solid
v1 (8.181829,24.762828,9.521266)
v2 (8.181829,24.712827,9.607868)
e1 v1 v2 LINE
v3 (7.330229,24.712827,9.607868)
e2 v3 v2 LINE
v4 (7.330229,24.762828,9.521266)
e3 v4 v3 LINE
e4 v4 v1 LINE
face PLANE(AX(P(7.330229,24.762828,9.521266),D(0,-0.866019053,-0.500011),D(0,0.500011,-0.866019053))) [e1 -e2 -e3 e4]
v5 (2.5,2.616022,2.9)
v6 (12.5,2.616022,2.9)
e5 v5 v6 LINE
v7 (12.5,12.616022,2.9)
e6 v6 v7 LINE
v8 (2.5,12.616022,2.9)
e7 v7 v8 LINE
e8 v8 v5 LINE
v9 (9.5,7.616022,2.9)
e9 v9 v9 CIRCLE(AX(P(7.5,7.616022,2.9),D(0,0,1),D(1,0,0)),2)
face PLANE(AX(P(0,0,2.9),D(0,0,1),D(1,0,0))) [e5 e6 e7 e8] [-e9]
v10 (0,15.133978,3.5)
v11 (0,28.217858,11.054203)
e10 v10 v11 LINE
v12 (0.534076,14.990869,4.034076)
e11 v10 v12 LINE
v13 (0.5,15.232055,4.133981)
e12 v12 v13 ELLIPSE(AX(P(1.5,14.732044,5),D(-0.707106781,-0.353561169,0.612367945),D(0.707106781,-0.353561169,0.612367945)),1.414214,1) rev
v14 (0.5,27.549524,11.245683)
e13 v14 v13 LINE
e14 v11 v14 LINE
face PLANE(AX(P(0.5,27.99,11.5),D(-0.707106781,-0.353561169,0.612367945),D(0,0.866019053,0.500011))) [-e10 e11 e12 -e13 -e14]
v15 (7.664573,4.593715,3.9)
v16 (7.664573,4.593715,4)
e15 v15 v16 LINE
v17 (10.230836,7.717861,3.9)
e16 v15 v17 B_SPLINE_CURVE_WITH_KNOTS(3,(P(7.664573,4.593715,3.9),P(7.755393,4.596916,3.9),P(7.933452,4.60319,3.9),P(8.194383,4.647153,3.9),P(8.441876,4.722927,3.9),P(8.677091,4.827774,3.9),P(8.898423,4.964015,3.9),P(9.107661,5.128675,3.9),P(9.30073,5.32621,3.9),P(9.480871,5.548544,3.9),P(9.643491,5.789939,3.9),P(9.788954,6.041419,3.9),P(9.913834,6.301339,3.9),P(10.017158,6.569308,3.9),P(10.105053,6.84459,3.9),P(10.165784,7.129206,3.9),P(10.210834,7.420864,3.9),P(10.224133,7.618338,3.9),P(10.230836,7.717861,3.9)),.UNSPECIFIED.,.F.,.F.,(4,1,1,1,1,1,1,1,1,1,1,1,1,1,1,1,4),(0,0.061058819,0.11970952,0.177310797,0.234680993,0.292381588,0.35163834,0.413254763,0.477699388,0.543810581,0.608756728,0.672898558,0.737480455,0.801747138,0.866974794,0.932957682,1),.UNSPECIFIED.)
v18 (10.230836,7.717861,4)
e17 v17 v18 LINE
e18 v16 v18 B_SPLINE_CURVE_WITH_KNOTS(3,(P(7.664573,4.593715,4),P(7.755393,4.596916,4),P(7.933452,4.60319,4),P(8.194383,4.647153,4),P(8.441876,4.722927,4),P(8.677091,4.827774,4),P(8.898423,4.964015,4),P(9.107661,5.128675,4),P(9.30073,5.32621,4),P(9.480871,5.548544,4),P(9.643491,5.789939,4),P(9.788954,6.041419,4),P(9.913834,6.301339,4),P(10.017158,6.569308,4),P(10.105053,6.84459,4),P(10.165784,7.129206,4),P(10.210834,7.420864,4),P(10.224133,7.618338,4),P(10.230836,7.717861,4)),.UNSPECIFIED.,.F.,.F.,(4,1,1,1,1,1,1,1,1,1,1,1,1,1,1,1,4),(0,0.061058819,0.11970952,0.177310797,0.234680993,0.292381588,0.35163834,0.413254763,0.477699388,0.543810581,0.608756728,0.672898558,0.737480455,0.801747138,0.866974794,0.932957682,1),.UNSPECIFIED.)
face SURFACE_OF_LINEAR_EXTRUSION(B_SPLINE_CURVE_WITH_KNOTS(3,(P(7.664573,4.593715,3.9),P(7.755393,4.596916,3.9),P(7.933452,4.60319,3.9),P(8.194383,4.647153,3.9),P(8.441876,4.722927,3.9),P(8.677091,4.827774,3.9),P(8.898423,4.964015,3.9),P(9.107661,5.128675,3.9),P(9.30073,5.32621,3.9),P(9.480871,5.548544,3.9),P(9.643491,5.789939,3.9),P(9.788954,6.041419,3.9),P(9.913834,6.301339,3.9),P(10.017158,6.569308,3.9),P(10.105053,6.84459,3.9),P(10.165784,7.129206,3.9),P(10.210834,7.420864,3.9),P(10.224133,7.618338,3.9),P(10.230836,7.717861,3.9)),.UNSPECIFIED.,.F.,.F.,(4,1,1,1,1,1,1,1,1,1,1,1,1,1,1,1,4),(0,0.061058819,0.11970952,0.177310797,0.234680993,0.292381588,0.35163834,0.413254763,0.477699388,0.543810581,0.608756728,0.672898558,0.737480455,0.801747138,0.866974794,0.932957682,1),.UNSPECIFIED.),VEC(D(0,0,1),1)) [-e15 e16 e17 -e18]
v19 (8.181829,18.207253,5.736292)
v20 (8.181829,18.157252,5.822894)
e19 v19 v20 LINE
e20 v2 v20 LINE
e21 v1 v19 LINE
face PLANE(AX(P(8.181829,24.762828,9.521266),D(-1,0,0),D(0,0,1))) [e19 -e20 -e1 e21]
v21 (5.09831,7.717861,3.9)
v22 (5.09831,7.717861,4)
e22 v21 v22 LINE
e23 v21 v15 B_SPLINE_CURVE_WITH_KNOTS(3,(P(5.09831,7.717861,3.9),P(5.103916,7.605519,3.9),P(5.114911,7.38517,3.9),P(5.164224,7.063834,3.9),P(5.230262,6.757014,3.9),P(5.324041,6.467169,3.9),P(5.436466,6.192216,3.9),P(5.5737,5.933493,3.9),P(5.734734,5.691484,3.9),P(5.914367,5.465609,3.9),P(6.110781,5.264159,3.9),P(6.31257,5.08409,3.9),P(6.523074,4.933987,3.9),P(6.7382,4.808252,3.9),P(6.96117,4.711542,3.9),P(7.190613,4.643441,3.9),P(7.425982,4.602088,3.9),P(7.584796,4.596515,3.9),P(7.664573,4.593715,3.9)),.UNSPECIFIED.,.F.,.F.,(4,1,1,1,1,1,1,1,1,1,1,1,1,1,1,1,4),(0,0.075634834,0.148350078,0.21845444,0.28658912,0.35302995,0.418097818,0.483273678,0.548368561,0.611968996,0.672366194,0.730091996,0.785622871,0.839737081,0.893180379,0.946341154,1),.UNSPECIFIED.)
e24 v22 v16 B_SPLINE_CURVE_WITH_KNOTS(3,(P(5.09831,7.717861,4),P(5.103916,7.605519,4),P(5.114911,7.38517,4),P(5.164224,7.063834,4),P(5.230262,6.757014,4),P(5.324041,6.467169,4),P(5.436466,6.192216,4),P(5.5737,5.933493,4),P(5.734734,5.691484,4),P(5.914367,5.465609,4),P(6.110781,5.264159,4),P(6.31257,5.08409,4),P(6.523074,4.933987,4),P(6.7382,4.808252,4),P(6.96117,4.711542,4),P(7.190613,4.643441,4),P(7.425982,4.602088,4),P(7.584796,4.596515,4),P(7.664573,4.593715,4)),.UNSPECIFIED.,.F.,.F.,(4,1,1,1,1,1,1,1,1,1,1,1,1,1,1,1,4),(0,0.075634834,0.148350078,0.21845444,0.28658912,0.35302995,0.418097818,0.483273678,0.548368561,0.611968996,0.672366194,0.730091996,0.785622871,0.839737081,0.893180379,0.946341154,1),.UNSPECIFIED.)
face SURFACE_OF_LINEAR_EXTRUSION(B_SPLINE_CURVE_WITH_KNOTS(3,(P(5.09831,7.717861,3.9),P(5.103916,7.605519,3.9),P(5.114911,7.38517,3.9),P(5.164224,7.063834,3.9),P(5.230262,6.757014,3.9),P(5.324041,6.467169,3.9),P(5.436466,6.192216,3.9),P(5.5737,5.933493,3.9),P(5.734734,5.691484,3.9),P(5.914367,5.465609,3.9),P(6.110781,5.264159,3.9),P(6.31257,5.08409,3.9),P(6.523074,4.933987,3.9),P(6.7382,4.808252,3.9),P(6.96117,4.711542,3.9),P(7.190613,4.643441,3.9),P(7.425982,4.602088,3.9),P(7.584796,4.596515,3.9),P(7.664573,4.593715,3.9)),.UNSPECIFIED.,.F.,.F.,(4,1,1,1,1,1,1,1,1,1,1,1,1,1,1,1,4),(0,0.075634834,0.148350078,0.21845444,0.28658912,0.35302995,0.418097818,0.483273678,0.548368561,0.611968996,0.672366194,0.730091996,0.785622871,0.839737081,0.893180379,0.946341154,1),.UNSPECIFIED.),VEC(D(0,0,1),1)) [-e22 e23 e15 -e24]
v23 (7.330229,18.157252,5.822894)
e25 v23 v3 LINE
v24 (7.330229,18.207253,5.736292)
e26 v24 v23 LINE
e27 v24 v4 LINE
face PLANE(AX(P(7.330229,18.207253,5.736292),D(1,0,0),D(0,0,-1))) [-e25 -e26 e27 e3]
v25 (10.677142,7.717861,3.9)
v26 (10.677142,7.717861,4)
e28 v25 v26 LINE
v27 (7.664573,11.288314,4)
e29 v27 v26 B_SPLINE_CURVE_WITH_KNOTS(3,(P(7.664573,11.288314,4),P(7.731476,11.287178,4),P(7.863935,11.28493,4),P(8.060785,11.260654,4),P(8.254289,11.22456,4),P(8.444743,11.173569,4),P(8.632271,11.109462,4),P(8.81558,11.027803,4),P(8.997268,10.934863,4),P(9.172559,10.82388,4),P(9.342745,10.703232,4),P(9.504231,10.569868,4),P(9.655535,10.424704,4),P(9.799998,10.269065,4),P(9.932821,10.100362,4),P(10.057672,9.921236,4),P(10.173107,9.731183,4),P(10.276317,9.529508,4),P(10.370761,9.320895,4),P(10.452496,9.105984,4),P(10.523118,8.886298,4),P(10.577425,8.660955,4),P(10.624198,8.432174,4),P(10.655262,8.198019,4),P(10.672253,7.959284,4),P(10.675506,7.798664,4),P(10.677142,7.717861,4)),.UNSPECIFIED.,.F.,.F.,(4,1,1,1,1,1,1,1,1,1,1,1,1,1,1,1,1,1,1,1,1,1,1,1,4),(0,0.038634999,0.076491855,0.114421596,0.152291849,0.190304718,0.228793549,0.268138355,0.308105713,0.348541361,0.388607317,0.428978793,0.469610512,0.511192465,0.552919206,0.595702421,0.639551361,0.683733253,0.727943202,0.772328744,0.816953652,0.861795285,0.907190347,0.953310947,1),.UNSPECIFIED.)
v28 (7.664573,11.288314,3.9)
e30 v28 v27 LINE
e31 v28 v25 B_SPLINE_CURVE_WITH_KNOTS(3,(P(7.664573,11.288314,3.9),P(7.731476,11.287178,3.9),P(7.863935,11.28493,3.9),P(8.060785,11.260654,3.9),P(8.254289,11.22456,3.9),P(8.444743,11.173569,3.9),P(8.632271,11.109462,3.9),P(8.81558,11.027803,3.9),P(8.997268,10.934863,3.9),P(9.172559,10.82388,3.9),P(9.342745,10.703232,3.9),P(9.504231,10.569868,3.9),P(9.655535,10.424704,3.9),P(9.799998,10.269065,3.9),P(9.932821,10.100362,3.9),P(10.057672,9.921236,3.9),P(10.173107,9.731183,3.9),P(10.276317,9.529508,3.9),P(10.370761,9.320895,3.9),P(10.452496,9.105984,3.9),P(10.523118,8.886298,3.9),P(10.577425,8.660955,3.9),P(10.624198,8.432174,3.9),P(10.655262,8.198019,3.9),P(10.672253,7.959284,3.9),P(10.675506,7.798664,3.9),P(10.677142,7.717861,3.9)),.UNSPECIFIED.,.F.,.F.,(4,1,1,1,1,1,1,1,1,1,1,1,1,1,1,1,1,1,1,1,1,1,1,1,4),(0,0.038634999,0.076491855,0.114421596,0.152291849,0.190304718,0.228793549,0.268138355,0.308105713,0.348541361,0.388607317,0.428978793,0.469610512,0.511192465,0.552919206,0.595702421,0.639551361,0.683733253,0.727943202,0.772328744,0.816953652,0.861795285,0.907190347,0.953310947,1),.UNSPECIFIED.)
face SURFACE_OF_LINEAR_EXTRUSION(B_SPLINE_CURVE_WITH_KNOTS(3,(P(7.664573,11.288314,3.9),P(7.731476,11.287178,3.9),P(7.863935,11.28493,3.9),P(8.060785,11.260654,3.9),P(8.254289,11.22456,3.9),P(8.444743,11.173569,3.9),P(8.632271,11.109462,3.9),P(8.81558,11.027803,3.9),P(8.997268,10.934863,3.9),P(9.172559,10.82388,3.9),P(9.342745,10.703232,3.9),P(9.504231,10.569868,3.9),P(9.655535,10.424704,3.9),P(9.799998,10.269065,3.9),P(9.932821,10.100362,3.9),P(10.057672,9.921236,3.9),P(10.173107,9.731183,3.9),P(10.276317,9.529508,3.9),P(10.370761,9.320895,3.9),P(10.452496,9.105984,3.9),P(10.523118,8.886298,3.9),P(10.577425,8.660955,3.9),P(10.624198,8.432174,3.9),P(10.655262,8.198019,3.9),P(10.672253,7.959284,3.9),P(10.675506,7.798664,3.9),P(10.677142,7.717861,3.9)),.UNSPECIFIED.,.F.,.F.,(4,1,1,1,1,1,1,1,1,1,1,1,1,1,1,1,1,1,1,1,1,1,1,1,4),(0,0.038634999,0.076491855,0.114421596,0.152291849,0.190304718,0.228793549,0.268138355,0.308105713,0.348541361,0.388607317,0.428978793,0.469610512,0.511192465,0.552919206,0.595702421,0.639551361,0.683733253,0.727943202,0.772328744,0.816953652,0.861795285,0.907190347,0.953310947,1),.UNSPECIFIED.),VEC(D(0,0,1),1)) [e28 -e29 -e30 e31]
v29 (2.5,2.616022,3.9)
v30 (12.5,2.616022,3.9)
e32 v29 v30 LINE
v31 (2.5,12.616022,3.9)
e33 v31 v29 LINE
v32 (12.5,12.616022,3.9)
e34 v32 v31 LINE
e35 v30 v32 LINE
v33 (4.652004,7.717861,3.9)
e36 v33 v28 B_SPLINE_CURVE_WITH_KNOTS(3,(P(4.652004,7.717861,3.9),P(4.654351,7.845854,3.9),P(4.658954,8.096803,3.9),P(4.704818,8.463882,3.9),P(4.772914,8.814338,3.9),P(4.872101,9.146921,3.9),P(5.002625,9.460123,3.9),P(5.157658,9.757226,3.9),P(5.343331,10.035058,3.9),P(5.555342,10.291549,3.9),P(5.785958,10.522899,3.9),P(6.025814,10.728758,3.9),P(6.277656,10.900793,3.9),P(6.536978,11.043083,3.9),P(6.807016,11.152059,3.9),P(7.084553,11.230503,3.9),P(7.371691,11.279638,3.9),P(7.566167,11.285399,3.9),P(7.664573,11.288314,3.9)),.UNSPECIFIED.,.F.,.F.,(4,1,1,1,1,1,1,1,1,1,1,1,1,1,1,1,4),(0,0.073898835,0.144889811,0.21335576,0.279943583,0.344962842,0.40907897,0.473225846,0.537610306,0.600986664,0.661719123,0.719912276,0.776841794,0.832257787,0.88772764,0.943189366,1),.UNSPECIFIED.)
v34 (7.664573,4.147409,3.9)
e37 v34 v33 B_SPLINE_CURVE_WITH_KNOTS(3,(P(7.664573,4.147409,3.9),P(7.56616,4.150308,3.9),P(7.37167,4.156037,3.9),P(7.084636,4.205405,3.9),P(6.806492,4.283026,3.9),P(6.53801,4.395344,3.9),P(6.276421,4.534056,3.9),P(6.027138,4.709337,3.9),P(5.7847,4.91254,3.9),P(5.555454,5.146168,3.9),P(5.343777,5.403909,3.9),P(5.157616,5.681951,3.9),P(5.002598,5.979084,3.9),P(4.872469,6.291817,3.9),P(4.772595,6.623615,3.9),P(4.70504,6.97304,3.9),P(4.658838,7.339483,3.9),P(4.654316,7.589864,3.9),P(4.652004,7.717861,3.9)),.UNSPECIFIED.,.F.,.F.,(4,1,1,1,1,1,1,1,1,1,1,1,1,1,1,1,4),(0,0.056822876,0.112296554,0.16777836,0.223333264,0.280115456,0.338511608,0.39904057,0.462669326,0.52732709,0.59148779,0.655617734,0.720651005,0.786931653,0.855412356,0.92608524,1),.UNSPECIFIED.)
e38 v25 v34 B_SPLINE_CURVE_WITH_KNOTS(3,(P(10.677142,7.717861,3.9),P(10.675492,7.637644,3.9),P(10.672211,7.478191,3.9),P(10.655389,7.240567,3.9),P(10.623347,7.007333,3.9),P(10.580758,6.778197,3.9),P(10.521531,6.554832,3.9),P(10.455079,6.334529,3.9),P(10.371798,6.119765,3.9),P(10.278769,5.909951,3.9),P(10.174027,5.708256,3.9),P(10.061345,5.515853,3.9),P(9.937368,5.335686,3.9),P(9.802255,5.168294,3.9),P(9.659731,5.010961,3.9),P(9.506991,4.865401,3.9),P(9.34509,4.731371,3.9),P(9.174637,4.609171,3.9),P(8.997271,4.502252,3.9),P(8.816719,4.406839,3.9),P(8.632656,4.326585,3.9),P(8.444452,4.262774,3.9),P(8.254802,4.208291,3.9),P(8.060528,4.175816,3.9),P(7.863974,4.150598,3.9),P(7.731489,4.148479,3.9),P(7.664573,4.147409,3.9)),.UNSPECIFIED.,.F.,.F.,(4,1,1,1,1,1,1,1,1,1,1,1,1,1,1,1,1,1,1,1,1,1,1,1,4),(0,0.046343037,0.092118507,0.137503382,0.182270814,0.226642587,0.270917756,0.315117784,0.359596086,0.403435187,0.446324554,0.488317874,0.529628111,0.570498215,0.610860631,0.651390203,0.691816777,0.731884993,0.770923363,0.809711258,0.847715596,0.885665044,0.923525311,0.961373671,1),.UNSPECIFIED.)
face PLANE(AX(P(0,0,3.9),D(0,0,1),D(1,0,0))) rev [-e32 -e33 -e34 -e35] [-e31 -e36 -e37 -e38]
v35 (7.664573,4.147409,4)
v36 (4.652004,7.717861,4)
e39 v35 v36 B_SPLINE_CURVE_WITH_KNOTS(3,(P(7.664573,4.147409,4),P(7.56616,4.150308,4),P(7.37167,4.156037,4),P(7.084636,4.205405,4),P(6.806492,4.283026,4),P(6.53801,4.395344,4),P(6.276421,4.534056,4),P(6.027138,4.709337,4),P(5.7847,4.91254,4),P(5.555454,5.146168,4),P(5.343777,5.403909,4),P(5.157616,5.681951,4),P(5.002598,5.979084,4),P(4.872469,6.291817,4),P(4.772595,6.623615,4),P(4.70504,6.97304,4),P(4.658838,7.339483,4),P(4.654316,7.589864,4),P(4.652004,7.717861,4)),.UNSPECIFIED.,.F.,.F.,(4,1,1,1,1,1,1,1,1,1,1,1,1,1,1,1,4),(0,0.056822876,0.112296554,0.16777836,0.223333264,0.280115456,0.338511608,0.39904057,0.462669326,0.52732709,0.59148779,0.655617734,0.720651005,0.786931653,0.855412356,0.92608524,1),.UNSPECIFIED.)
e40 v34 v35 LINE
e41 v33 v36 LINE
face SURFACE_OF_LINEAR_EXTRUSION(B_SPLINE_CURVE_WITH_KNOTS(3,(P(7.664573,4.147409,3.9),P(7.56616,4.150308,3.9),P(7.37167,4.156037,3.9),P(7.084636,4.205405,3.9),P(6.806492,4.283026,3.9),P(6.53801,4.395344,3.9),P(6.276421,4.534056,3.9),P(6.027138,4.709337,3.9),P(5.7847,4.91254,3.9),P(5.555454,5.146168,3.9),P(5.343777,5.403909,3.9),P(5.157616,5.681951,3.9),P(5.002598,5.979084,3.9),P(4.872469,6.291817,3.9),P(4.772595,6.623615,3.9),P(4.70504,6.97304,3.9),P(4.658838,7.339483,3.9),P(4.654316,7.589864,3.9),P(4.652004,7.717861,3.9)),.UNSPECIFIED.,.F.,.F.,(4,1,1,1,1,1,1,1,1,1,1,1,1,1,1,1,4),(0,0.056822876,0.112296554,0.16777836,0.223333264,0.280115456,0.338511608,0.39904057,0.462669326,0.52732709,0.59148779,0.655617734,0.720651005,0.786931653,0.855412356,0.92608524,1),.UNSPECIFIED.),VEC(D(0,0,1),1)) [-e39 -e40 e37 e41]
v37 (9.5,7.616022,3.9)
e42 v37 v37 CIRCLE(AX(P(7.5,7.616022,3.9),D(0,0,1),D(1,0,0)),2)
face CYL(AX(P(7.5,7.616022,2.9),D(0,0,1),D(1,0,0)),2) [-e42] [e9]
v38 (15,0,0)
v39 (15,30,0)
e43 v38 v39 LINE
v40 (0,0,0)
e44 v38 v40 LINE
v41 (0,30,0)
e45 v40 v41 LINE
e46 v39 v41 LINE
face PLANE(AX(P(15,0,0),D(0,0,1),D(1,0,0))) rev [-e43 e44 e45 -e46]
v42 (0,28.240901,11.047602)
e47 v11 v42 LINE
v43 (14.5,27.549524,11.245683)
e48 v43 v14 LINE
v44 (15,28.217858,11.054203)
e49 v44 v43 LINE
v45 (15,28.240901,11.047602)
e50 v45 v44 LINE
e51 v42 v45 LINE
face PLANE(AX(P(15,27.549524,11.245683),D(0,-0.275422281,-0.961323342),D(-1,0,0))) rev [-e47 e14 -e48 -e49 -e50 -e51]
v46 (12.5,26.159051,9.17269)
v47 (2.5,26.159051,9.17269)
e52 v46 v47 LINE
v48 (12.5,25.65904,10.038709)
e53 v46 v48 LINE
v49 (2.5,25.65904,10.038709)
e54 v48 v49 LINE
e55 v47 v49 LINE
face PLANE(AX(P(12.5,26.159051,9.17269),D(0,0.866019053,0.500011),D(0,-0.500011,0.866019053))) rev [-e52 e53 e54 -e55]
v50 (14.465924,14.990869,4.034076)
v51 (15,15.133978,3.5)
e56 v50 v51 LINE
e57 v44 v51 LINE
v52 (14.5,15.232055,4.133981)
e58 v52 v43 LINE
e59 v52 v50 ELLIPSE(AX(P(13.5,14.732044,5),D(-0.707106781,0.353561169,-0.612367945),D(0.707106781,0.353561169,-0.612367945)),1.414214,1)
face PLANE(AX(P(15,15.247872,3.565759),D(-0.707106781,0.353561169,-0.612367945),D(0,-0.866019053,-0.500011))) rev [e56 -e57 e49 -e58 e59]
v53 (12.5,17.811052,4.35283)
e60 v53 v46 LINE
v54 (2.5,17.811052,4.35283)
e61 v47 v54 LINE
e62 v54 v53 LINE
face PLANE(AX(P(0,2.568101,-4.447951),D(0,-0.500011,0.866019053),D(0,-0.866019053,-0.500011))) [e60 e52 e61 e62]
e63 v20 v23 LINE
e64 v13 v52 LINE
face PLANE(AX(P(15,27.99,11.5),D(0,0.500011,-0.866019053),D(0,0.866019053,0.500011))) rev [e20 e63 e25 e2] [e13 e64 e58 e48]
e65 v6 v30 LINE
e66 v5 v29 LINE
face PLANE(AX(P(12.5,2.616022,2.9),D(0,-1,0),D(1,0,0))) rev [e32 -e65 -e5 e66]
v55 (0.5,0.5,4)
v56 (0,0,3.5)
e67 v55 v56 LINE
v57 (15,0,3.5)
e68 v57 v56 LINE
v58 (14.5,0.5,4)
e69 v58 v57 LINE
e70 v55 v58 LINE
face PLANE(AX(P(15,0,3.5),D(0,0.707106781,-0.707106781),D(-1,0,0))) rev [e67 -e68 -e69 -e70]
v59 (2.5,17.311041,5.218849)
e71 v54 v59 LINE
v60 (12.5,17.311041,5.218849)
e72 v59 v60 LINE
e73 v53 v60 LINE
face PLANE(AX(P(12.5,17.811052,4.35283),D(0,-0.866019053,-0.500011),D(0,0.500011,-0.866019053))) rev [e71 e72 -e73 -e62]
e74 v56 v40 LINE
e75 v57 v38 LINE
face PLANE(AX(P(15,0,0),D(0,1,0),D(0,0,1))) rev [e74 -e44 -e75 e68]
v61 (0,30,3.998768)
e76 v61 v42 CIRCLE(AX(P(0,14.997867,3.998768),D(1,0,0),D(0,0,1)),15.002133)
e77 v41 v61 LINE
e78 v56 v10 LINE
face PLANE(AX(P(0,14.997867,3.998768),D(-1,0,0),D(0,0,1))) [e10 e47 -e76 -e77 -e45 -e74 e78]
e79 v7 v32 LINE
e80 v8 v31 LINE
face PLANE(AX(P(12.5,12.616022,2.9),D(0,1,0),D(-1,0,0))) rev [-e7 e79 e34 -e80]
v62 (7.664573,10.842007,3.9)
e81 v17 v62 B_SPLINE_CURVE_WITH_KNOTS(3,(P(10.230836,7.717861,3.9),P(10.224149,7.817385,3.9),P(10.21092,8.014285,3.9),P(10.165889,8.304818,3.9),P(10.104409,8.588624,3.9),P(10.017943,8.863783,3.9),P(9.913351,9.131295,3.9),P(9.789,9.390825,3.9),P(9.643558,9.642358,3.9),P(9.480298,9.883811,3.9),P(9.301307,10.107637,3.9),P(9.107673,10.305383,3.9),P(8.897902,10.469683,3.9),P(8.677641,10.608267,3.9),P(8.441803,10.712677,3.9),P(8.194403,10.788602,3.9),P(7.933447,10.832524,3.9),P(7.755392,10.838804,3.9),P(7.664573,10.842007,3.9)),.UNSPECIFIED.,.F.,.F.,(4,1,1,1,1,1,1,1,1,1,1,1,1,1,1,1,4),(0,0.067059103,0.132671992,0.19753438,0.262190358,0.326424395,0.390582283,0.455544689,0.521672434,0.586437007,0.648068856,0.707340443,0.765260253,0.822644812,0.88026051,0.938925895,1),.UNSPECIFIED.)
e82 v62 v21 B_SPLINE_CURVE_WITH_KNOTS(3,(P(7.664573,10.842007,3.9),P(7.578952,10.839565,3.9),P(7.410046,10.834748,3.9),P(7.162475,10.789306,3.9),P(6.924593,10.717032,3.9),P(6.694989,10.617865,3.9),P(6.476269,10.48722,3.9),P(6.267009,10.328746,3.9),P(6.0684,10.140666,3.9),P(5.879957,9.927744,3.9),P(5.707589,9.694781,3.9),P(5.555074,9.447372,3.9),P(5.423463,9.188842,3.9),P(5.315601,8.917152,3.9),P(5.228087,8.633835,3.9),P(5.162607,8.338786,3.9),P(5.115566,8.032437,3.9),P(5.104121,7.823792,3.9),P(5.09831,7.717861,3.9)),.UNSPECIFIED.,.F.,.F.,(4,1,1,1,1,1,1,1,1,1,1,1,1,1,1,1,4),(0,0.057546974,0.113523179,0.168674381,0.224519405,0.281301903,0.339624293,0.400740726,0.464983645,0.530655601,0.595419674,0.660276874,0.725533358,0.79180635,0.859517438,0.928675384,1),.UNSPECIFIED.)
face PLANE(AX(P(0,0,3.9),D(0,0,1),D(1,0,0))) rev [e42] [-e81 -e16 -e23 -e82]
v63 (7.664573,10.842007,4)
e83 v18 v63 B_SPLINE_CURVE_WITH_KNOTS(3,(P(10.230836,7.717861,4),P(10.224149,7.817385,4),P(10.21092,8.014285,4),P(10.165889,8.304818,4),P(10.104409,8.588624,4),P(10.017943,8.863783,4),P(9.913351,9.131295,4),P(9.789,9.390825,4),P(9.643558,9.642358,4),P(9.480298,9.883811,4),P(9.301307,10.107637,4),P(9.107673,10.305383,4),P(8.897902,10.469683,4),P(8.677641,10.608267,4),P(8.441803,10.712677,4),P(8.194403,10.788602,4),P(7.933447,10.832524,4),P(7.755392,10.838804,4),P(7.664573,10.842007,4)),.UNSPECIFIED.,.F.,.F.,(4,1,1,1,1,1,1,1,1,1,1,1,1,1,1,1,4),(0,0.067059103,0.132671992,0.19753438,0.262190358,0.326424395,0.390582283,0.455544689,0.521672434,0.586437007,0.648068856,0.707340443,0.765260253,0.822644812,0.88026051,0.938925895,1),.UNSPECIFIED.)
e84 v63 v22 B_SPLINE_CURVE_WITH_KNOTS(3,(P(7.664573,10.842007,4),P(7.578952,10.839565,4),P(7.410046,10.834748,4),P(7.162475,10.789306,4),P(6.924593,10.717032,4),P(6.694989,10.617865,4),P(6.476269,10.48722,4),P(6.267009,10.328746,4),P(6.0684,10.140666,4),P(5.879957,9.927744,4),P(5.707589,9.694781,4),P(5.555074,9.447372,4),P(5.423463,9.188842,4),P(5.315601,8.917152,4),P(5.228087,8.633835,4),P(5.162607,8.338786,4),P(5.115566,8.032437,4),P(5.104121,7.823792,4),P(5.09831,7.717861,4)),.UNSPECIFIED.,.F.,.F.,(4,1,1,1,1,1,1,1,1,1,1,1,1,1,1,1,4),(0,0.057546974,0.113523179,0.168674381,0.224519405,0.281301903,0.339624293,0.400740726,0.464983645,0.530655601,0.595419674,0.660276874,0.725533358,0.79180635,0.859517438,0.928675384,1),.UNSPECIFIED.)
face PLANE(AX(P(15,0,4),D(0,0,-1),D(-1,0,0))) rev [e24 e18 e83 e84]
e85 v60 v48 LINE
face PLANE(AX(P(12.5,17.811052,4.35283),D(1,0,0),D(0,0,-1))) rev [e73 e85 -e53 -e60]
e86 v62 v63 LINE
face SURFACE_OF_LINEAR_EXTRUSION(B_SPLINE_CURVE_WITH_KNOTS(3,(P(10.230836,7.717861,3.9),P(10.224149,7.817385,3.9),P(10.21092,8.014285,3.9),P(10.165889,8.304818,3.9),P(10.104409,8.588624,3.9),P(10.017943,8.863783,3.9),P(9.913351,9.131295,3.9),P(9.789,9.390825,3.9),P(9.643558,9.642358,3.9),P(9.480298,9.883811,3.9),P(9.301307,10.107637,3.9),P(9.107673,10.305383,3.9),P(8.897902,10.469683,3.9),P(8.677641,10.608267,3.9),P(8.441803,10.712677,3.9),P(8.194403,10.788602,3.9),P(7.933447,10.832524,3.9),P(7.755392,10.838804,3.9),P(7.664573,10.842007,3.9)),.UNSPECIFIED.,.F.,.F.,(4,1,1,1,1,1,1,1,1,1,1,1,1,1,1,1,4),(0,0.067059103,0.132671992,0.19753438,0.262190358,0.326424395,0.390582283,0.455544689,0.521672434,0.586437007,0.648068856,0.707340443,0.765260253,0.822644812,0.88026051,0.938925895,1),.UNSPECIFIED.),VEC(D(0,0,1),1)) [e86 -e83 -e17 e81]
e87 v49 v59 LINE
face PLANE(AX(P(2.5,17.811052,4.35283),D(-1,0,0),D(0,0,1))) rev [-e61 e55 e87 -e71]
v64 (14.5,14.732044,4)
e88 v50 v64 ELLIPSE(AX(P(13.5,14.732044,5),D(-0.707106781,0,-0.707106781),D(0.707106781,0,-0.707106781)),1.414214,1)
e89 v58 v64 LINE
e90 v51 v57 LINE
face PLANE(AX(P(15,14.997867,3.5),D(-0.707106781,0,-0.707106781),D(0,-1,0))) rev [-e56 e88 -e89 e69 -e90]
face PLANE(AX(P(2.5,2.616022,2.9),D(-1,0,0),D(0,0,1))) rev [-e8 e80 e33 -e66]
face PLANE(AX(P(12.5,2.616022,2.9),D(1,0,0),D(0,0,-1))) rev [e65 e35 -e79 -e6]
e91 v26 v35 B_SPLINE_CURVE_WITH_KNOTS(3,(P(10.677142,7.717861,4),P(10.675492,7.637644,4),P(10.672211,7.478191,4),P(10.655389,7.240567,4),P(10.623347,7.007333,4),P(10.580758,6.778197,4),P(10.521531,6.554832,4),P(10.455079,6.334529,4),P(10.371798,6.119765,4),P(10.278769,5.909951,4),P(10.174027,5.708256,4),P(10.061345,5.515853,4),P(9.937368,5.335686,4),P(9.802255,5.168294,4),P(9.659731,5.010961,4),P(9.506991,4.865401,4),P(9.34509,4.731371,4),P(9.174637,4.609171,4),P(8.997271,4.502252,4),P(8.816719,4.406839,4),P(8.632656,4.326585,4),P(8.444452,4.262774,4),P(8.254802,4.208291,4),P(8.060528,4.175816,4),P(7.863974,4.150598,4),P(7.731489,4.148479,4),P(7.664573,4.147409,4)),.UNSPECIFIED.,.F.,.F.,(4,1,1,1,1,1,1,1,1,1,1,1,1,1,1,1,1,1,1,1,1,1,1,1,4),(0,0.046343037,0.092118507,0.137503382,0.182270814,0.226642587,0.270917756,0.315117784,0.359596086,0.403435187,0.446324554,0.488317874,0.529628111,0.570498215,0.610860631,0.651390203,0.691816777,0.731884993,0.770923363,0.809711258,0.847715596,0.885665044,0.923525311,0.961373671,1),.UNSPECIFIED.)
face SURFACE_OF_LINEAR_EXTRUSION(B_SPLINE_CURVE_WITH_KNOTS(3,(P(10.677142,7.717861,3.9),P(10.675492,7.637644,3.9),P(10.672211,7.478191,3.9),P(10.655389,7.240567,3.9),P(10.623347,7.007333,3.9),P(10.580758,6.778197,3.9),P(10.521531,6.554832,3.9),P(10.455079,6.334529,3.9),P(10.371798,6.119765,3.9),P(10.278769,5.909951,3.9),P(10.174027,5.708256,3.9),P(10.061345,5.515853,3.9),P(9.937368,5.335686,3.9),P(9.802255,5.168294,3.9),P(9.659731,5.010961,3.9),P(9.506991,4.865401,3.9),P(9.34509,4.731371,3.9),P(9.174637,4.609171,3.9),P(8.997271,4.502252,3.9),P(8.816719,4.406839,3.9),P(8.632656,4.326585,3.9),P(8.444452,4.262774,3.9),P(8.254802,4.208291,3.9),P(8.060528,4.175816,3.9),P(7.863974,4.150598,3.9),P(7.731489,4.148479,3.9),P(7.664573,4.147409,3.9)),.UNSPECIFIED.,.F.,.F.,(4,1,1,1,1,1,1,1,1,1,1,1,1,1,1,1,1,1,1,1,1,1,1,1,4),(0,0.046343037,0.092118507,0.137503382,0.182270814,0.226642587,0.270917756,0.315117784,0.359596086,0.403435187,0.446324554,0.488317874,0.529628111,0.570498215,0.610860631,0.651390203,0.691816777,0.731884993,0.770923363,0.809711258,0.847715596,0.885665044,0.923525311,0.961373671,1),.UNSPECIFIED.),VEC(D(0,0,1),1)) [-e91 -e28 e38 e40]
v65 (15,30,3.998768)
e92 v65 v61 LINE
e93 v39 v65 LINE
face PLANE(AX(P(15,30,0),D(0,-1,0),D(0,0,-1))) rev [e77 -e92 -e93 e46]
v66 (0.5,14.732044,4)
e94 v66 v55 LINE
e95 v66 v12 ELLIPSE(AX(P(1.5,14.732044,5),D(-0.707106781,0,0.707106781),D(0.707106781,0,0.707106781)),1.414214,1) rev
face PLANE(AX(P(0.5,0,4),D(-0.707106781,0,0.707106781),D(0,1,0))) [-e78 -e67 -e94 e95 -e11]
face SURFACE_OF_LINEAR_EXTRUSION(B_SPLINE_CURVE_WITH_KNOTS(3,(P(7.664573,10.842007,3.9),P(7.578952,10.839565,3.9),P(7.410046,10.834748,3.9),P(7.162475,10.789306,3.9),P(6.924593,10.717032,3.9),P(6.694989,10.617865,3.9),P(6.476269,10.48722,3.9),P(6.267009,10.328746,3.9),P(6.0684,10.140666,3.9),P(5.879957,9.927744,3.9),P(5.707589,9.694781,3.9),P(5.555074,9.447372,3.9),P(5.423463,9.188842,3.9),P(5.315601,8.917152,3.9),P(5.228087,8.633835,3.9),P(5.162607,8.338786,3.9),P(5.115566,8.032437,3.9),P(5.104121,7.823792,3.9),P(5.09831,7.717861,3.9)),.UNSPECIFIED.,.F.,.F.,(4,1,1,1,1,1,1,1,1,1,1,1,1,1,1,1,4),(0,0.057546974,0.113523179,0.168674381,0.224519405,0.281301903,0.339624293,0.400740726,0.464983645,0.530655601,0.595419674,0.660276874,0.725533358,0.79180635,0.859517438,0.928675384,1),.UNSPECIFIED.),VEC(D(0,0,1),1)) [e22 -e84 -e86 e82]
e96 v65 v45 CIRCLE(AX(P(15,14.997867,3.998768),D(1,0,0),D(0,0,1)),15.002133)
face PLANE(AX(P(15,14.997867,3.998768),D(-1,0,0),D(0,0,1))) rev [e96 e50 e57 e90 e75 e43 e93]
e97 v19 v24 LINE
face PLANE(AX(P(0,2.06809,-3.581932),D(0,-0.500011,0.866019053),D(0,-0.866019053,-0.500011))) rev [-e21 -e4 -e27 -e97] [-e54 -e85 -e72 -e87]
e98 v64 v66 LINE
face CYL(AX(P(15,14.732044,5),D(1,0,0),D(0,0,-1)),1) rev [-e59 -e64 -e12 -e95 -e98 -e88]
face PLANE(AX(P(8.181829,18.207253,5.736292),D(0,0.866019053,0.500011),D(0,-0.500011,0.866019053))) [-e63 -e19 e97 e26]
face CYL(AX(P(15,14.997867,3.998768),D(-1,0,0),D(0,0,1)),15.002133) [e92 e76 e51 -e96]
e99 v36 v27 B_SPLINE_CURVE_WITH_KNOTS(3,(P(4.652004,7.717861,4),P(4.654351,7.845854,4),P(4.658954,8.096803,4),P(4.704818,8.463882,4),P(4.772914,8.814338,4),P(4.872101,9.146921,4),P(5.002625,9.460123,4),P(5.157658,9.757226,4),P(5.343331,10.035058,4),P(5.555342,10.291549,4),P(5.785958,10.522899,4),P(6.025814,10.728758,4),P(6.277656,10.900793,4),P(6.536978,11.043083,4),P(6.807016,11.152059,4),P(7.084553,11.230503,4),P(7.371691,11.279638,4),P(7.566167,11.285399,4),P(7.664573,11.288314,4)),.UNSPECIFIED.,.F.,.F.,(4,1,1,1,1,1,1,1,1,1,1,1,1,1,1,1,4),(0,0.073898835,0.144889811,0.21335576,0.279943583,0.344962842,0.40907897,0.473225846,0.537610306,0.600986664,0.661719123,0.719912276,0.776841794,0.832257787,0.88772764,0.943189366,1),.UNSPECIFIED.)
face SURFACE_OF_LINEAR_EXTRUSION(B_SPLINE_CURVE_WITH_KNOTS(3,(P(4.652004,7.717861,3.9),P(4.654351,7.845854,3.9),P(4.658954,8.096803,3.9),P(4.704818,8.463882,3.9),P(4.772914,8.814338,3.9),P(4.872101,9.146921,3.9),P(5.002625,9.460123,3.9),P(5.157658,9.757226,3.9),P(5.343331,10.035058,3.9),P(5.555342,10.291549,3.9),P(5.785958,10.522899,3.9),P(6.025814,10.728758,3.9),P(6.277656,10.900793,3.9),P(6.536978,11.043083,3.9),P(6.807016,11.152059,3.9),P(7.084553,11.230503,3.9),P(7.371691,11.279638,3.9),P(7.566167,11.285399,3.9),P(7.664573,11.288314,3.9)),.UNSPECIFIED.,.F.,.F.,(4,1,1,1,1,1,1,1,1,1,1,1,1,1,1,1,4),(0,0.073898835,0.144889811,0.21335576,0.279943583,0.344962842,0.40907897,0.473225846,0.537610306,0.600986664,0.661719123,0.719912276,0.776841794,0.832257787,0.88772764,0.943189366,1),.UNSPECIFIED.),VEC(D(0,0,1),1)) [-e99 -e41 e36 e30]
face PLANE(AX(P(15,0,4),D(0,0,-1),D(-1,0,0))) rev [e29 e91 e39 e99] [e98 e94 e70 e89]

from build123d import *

# Parameters (mm, degrees)
RESSALTO_EXTRUS_O1_DEPTH = 15
FILETE1_R                = 1
CORTE_EXTRUS_O1_DEPTH    = 0.1
ESBO_O2_W                = 0.851600406
ESBO_O2_H                = 7.569781387
CORTE_EXTRUS_O2_DEPTH    = 0.1
ESBO_O5_W                = 10
ESBO_O5_H                = 9.639509302
CORTE_EXTRUS_O3_DEPTH    = 1
ESBO_O7_W                = 10
ESBO_O7_H                = 10
ESBO_O7_R                = 2
CORTE_EXTRUS_O4_DEPTH    = 1


with BuildPart() as part:
    # Esboço1 → Ressalto-extrusão1 (new body)
    with BuildSketch(Plane(origin=(0, 0, 0), x_dir=(0, 0, -1), z_dir=(1, 0, 0))):
        with BuildLine():
            Line((0, 0), (0, 30.000000051))
            Line((0, 30.000000051), (-3.998768252, 30.000000051))
            ThreePointArc((-3.998768252, 30.000000051), (-7.881698136, 29.488790089), (-11.5, 27.99))
            Line((-11.5, 27.99), (-4, 15))
            Line((-4, 15), (-4, 0))
            Line((-4, 0), (0, 0))
        make_face()
    extrude(amount=RESSALTO_EXTRUS_O1_DEPTH)

    # Chanfro1
    # the kernel refuses this chamfer: 0.5 mm, written as the material it takes off along each edge
    with BuildSketch(Plane(origin=(-1.285841494, 0, 4), x_dir=(0, 0.9996219169112968, 0.02749587661058563), z_dir=(1, 0, 0))) as chanfro1_piece_1:
        with BuildLine():
            Line((0.514336598, 0), (-0.028273577, -0.513558897))
            Line((-0.028273577, -0.513558897), (-0.038269797, -0.513283938))
            ThreePointArc((-0.038269797, -0.513283938), (-0.017064614, -0.256698915), (-0.009996219, 0.000274959))
            Line((-0.009996219, 0.000274959), (0.000274959, 0.009996219))
            ThreePointArc((0.000274959, 0.009996219), (0.257248832, 0.002927825), (0.514611556, 0.009996219))
            Line((0.514611556, 0.009996219), (0.514336598, 0))
        make_face()
    extrude(amount=17.571682988, mode=Mode.SUBTRACT)
    with BuildSketch(Plane(origin=(-1.329115007, 27.99, 11.5), x_dir=(0, 0.5080962440375398, -0.8613003000086236), z_dir=(1, 0, 0))) as chanfro1_piece_2:
        with BuildLine():
            Line((0.531646003, 0), (-0.019274737, -0.522360638))
            Line((-0.019274737, -0.522360638), (-0.029274299, -0.522267024))
            ThreePointArc((-0.029274299, -0.522267024), (-0.012445314, -0.261154032), (-0.009999562, 9.3614e-05))
            Line((-0.009999562, 9.3614e-05), (9.3614e-05, 0.009999562))
            ThreePointArc((9.3614e-05, 0.009999562), (0.265962617, 0.005155355), (0.532084323, 0.009990389))
            Line((0.532084323, 0.009990389), (0.531646003, 0))
        make_face()
    extrude(amount=17.658230014, mode=Mode.SUBTRACT)
    with BuildSketch(Plane(origin=(15, 29.103563232, 12.142934892), x_dir=(-0.9996219169112968, -0.01374824076991902, 0.023811953013499736), z_dir=(0, -0.866019052628739, -0.5000110003630134))) as chanfro1_piece_3_section:
        with BuildLine():
            Line((0.514336598, 0), (-0.028273577, 0.513558897))
            Line((-0.028273577, 0.513558897), (-0.038269797, 0.513283938))
            ThreePointArc((-0.038269797, 0.513283938), (-0.017064614, 0.256698915), (-0.009996219, -0.000274959))
            Line((-0.009996219, -0.000274959), (0.000274959, -0.009996219))
            ThreePointArc((0.000274959, -0.009996219), (0.257248832, -0.002927825), (0.514611556, -0.009996219))
            Line((0.514611556, -0.009996219), (0.514336598, 0))
        make_face()
    chanfro1_piece_3 = extrude(amount=17.571352984, mode=Mode.PRIVATE)
    chanfro1_piece_3 = split(chanfro1_piece_3, bisect_by=Plane(origin=(14.834184444, 22.255751757, 4), z_dir=(0, 0, 1)), keep=Keep.TOP, mode=Mode.PRIVATE)
    add(chanfro1_piece_3, mode=Mode.SUBTRACT)
    with BuildSketch(Plane(origin=(15, 16.285841494, 4), x_dir=(-0.9996219169112968, 0, 0.027495876610585647), z_dir=(0, -1, 0))) as chanfro1_piece_4_section:
        with BuildLine():
            Line((0.514336598, 0), (-0.028273577, 0.513558897))
            Line((-0.028273577, 0.513558897), (-0.038269797, 0.513283938))
            ThreePointArc((-0.038269797, 0.513283938), (-0.017064614, 0.256698915), (-0.009996219, -0.000274959))
            Line((-0.009996219, -0.000274959), (0.000274959, -0.009996219))
            ThreePointArc((0.000274959, -0.009996219), (0.257248832, -0.002927825), (0.514611556, -0.009996219))
            Line((0.514611556, -0.009996219), (0.514336598, 0))
        make_face()
    chanfro1_piece_4 = extrude(amount=17.571682988, mode=Mode.PRIVATE)
    chanfro1_piece_4 = split(chanfro1_piece_4, bisect_by=Plane(origin=(14.834184463, 8.71625695, 0.371972835), z_dir=(0, -0.5000110003630134, 0.866019052628739)), keep=Keep.TOP, mode=Mode.PRIVATE)
    add(chanfro1_piece_4, mode=Mode.SUBTRACT)
    with BuildSketch(Plane(origin=(0, 16.285841494, 4), x_dir=(0.9996219169112968, 0, 0.02749587661058563), z_dir=(0, -1, 0))) as chanfro1_piece_5_section:
        with BuildLine():
            Line((0.514336598, 0), (-0.028273577, -0.513558897))
            Line((-0.028273577, -0.513558897), (-0.038269797, -0.513283938))
            ThreePointArc((-0.038269797, -0.513283938), (-0.017064614, -0.256698915), (-0.009996219, 0.000274959))
            Line((-0.009996219, 0.000274959), (0.000274959, 0.009996219))
            ThreePointArc((0.000274959, 0.009996219), (0.257248832, 0.002927825), (0.514611556, 0.009996219))
            Line((0.514611556, 0.009996219), (0.514336598, 0))
        make_face()
    chanfro1_piece_5 = extrude(amount=17.571682988, mode=Mode.PRIVATE)
    chanfro1_piece_5 = split(chanfro1_piece_5, bisect_by=Plane(origin=(0.165815537, 8.71625695, 0.371972835), z_dir=(0, -0.5000110003630134, 0.866019052628739)), keep=Keep.TOP, mode=Mode.PRIVATE)
    add(chanfro1_piece_5, mode=Mode.SUBTRACT)
    with BuildSketch(Plane(origin=(0, 29.103563232, 12.142934892), x_dir=(0.9996219169112968, -0.01374824076991901, 0.023811953013499722), z_dir=(0, -0.866019052628739, -0.5000110003630134))) as chanfro1_piece_6_section:
        with BuildLine():
            Line((0.514336598, 0), (-0.028273577, -0.513558897))
            Line((-0.028273577, -0.513558897), (-0.038269797, -0.513283938))
            ThreePointArc((-0.038269797, -0.513283938), (-0.017064614, -0.256698915), (-0.009996219, 0.000274959))
            Line((-0.009996219, 0.000274959), (0.000274959, 0.009996219))
            ThreePointArc((0.000274959, 0.009996219), (0.257248832, 0.002927825), (0.514611556, 0.009996219))
            Line((0.514611556, 0.009996219), (0.514336598, 0))
        make_face()
    chanfro1_piece_6 = extrude(amount=17.571352984, mode=Mode.PRIVATE)
    chanfro1_piece_6 = split(chanfro1_piece_6, bisect_by=Plane(origin=(0.165815556, 22.255751757, 4), z_dir=(0, 0, 1)), keep=Keep.TOP, mode=Mode.PRIVATE)
    add(chanfro1_piece_6, mode=Mode.SUBTRACT)
    with BuildSketch(Plane(origin=(15, 29.103563232, 12.142934892), x_dir=(-0.9996219169112968, -0.01374824076991902, 0.023811953013499736), z_dir=(0, -0.866019052628739, -0.5000110003630134))) as chanfro1_piece_7a_section:
        with BuildLine():
            Line((0.514336598, 0), (-0.028273577, 0.513558897))
            Line((-0.028273577, 0.513558897), (-0.038269797, 0.513283938))
            ThreePointArc((-0.038269797, 0.513283938), (-0.017064614, 0.256698915), (-0.009996219, -0.000274959))
            Line((-0.009996219, -0.000274959), (0.000274959, -0.009996219))
            ThreePointArc((0.000274959, -0.009996219), (0.257248832, -0.002927825), (0.514611556, -0.009996219))
            Line((0.514611556, -0.009996219), (0.514336598, 0))
        make_face()
    chanfro1_piece_7a = extrude(amount=17.571352984, mode=Mode.PRIVATE)
    chanfro1_piece_7a = split(chanfro1_piece_7a, bisect_by=Plane(origin=(14.844457521, 14.67120849, 4), z_dir=(0, 0, -1)), keep=Keep.TOP, mode=Mode.PRIVATE)
    with BuildSketch(Plane(origin=(15, 16.285841494, 4), x_dir=(-0.9996219169112968, 0, 0.027495876610585647), z_dir=(0, -1, 0))) as chanfro1_piece_7b_section:
        with BuildLine():
            Line((0.514336598, 0), (-0.028273577, 0.513558897))
            Line((-0.028273577, 0.513558897), (-0.038269797, 0.513283938))
            ThreePointArc((-0.038269797, 0.513283938), (-0.017064614, 0.256698915), (-0.009996219, -0.000274959))
            Line((-0.009996219, -0.000274959), (0.000274959, -0.009996219))
            ThreePointArc((0.000274959, -0.009996219), (0.257248832, -0.002927825), (0.514611556, -0.009996219))
            Line((0.514611556, -0.009996219), (0.514336598, 0))
        make_face()
    chanfro1_piece_7b = extrude(amount=17.571682988, mode=Mode.PRIVATE)
    chanfro1_piece_7b = split(chanfro1_piece_7b, bisect_by=Plane(origin=(14.844457521, 15.284739712, 4.164399372), z_dir=(0, 0.5000110003630134, -0.866019052628739)), keep=Keep.TOP, mode=Mode.PRIVATE)
    chanfro1_piece_7 = chanfro1_piece_7a & chanfro1_piece_7b
    add(chanfro1_piece_7, mode=Mode.SUBTRACT)
    with BuildSketch(Plane(origin=(0, 29.103563232, 12.142934892), x_dir=(0.9996219169112968, -0.01374824076991901, 0.023811953013499722), z_dir=(0, -0.866019052628739, -0.5000110003630134))) as chanfro1_piece_8a_section:
        with BuildLine():
            Line((0.514336598, 0), (-0.028273577, -0.513558897))
            Line((-0.028273577, -0.513558897), (-0.038269797, -0.513283938))
            ThreePointArc((-0.038269797, -0.513283938), (-0.017064614, -0.256698915), (-0.009996219, 0.000274959))
            Line((-0.009996219, 0.000274959), (0.000274959, 0.009996219))
            ThreePointArc((0.000274959, 0.009996219), (0.257248832, 0.002927825), (0.514611556, 0.009996219))
            Line((0.514611556, 0.009996219), (0.514336598, 0))
        make_face()
    chanfro1_piece_8a = extrude(amount=17.571352984, mode=Mode.PRIVATE)
    chanfro1_piece_8a = split(chanfro1_piece_8a, bisect_by=Plane(origin=(0.155542479, 14.67120849, 4), z_dir=(0, 0, -1)), keep=Keep.TOP, mode=Mode.PRIVATE)
    with BuildSketch(Plane(origin=(0, 16.285841494, 4), x_dir=(0.9996219169112968, 0, 0.02749587661058563), z_dir=(0, -1, 0))) as chanfro1_piece_8b_section:
        with BuildLine():
            Line((0.514336598, 0), (-0.028273577, -0.513558897))
            Line((-0.028273577, -0.513558897), (-0.038269797, -0.513283938))
            ThreePointArc((-0.038269797, -0.513283938), (-0.017064614, -0.256698915), (-0.009996219, 0.000274959))
            Line((-0.009996219, 0.000274959), (0.000274959, 0.009996219))
            ThreePointArc((0.000274959, 0.009996219), (0.257248832, 0.002927825), (0.514611556, 0.009996219))
            Line((0.514611556, 0.009996219), (0.514336598, 0))
        make_face()
    chanfro1_piece_8b = extrude(amount=17.571682988, mode=Mode.PRIVATE)
    chanfro1_piece_8b = split(chanfro1_piece_8b, bisect_by=Plane(origin=(0.155542479, 15.284739712, 4.164399372), z_dir=(0, 0.5000110003630134, -0.866019052628739)), keep=Keep.TOP, mode=Mode.PRIVATE)
    chanfro1_piece_8 = chanfro1_piece_8a & chanfro1_piece_8b
    add(chanfro1_piece_8, mode=Mode.SUBTRACT)

    # Filete1
    filete1_edges = [part.edges().sort_by_distance(p)[0] for p in [
        (7.5, 15, 4),
    ]]
    fillet(filete1_edges, radius=FILETE1_R)

    # Esboço4 → Corte-extrusão1 (cut)
    with BuildSketch(Plane.XY.offset(4)):
        with BuildLine():
            add(Edge.make_bspline(
                [(10.677142464, 7.717861332), (10.675491893, 7.637643685), (10.672210966, 7.478190821), (10.65538923, 7.240566988), (10.623347331, 7.007332743), (10.580757754, 6.778196585), (10.521530651, 6.554832351), (10.455078991, 6.334528983), (10.371798484, 6.119765454), (10.278769369, 5.909951206), (10.174027491, 5.708256453), (10.061344868, 5.515853133), (9.937368217, 5.335686475), (9.802255278, 5.168293604), (9.659731297, 5.01096062), (9.506991195, 4.86540107), (9.345090035, 4.731371027), (9.174636706, 4.609171357), (8.99727128, 4.502252193), (8.816718527, 4.406838826), (8.632656274, 4.326585067), (8.444451996, 4.262773798), (8.254802385, 4.208290712), (8.060527696, 4.175816019), (7.863974081, 4.150598415), (7.731489385, 4.148479207), (7.66457316, 4.147408823)],
                knots=[0, 0, 0, 0, 1.112232891, 2.210844172, 3.300081163, 4.374499544, 5.439422096, 6.502026147, 7.562826816, 8.630306062, 9.682444482, 10.711789295, 11.719628984, 12.711074663, 13.691957169, 14.660655153, 15.63336488, 16.603602659, 17.565239823, 18.502160713, 19.433070182, 20.345174306, 21.255961054, 22.164607458, 23.072968101, 24, 24, 24, 24], degree=3))
            add(Edge.make_bspline(
                [(7.66457316, 4.147408823), (7.566159877, 4.150307832), (7.371670031, 4.156037015), (7.084636065, 4.205404923), (6.806491624, 4.283026108), (6.538010436, 4.395344378), (6.276421328, 4.534056052), (6.027137985, 4.709336817), (5.784699559, 4.912539502), (5.555454058, 5.146167763), (5.343776563, 5.403908656), (5.157616094, 5.681951296), (5.002598461, 5.979084138), (4.872469059, 6.291817419), (4.772595359, 6.623614607), (4.705040321, 6.973040142), (4.658837633, 7.339482543), (4.654315579, 7.589863759), (4.652003856, 7.717861332)],
                knots=[0, 0, 0, 0, 0.909166022, 1.796744864, 2.684453754, 3.573332222, 4.481847292, 5.41618573, 6.384649117, 7.402709214, 8.437233447, 9.463804637, 10.489883747, 11.530416076, 12.590906446, 13.686597692, 14.817363838, 16, 16, 16, 16], degree=3))
            add(Edge.make_bspline(
                [(4.652003856, 7.717861332), (4.654351194, 7.845854009), (4.658953504, 8.096802954), (4.704817807, 8.463881899), (4.772914354, 8.814337975), (4.87210068, 9.14692119), (5.002625371, 9.460122794), (5.15765814, 9.757226091), (5.343330676, 10.035058039), (5.555341937, 10.291548896), (5.785957778, 10.522899205), (6.025814065, 10.728757772), (6.277655638, 10.900792935), (6.536977624, 11.04308332), (6.807016281, 11.152058947), (7.084552761, 11.230503451), (7.371691448, 11.279637905), (7.566167073, 11.285398791), (7.66457316, 11.288313841)],
                knots=[0, 0, 0, 0, 1.182381368, 2.318236969, 3.413692153, 4.479097322, 5.519405472, 6.545263518, 7.571613538, 8.601764894, 9.615786618, 10.587505976, 11.518596411, 12.429468701, 13.316124599, 14.203642237, 15.091029854, 16, 16, 16, 16], degree=3))
            add(Edge.make_bspline(
                [(7.66457316, 11.288313841), (7.731476328, 11.287178127), (7.863935174, 11.284929573), (8.060784597, 11.260654251), (8.254288991, 11.224560055), (8.444743052, 11.173569163), (8.632270949, 11.10946206), (8.815579819, 11.027802727), (8.997268221, 10.934862635), (9.172559362, 10.823879659), (9.342745146, 10.703232049), (9.504230646, 10.569868351), (9.655534501, 10.424703596), (9.799997583, 10.26906524), (9.932820526, 10.100361538), (10.057671679, 9.921236268), (10.17310707, 9.731183126), (10.276316989, 9.529507568), (10.370760826, 9.320894644), (10.452496074, 9.105983505), (10.523117676, 8.886297831), (10.577425263, 8.660954579), (10.624198013, 8.432173987), (10.655261664, 8.19801895), (10.672253355, 7.959284368), (10.67550612, 7.798663607), (10.677142464, 7.717861332)],
                knots=[0, 0, 0, 0, 0.927239978, 1.835804509, 2.746118307, 3.655004384, 4.567313236, 5.491045181, 6.435320531, 7.394537119, 8.364992675, 9.326575615, 10.29549103, 11.270652298, 12.268619163, 13.270060955, 14.296858096, 15.349232675, 16.409598064, 17.470636838, 18.535889856, 19.606887649, 20.683086841, 21.772568318, 22.879462736, 24, 24, 24, 24], degree=3))
        make_face()
        with BuildLine():
            add(Edge.make_bspline(
                [(10.230835901, 7.717861332), (10.224149096, 7.817384754), (10.210919696, 8.014285252), (10.165889121, 8.304818145), (10.10440883, 8.588623605), (10.017942552, 8.863782701), (9.913350657, 9.131294998), (9.789000181, 9.390824574), (9.643558179, 9.642358317), (9.480297946, 9.883811377), (9.30130714, 10.107636689), (9.107673193, 10.305382764), (8.897902322, 10.469683372), (8.677640595, 10.608267408), (8.441803115, 10.712677065), (8.194402778, 10.788602114), (7.933446805, 10.8325239), (7.755391648, 10.838804041), (7.66457316, 10.842007278)],
                knots=[0, 0, 0, 0, 1.072945641, 2.122751872, 3.160550073, 4.195045731, 5.222790319, 6.249316523, 7.288715031, 8.346758945, 9.38299211, 10.369101689, 11.317447082, 12.244164047, 13.162316996, 14.084168162, 15.022814312, 16, 16, 16, 16], degree=3))
            add(Edge.make_bspline(
                [(7.66457316, 10.842007278), (7.578951813, 10.839565255), (7.41004619, 10.834747864), (7.162474672, 10.789306497), (6.924593315, 10.717031705), (6.694989062, 10.617864996), (6.476268571, 10.487219539), (6.267009132, 10.328746298), (6.068400439, 10.140665945), (5.879956973, 9.927744423), (5.707589059, 9.694780855), (5.555074142, 9.447371831), (5.423463422, 9.188842243), (5.315600507, 8.917151559), (5.228087427, 8.633834871), (5.162607375, 8.33878598), (5.115565833, 8.032436858), (5.104121062, 7.823792485), (5.098310419, 7.717861332)],
                knots=[0, 0, 0, 0, 0.920751586, 1.816370871, 2.698790093, 3.592310473, 4.500830444, 5.433988683, 6.411851609, 7.439738322, 8.490489621, 9.526714784, 10.564429984, 11.608533727, 12.668901603, 13.752279013, 14.858806142, 16, 16, 16, 16], degree=3))
            add(Edge.make_bspline(
                [(5.098310419, 7.717861332), (5.103916197, 7.605518764), (5.114911362, 7.385170178), (5.164224192, 7.063834288), (5.230261511, 6.757014391), (5.324040601, 6.467168505), (5.436465785, 6.1922159), (5.573699539, 5.933493099), (5.734734435, 5.691483653), (5.91436711, 5.465608967), (6.110780968, 5.264158888), (6.312570348, 5.084090072), (6.52307409, 4.933987063), (6.738199671, 4.808252439), (6.961169517, 4.711541801), (7.190613348, 4.643440575), (7.42598174, 4.602087566), (7.584795851, 4.596514775), (7.66457316, 4.593715387)],
                knots=[0, 0, 0, 0, 1.210157347, 2.373601246, 3.495271046, 4.585425916, 5.648479198, 6.689565086, 7.732378856, 8.773896982, 9.791503928, 10.757859102, 11.68147193, 12.569965943, 13.435793289, 14.290886071, 15.141458466, 16, 16, 16, 16], degree=3))
            add(Edge.make_bspline(
                [(7.66457316, 4.593715387), (7.755393406, 4.596915746), (7.93345201, 4.603190245), (8.19438306, 4.647152826), (8.441875555, 4.722927027), (8.677091244, 4.82777369), (8.898422511, 4.964014542), (9.107660587, 5.12867529), (9.300729799, 5.326210469), (9.480871416, 5.54854368), (9.643490833, 5.789938842), (9.788953577, 6.04141911), (9.913834466, 6.301339386), (10.017157537, 6.569308064), (10.105052944, 6.844589634), (10.165784446, 7.129206023), (10.210834308, 7.420864495), (10.224133398, 7.618338151), (10.230835901, 7.717861332)],
                knots=[0, 0, 0, 0, 0.976941104, 1.915352318, 2.83697275, 3.754895891, 4.678105416, 5.626213443, 6.612076206, 7.643190205, 8.700969298, 9.740107651, 10.766376922, 11.799687281, 12.827954204, 13.8715967, 14.92732291, 16, 16, 16, 16], degree=3))
        make_face(mode=Mode.SUBTRACT)
    extrude(amount=-CORTE_EXTRUS_O1_DEPTH, mode=Mode.SUBTRACT)

    # Esboço2 → Corte-extrusão2 (cut)
    with BuildSketch(Plane(origin=(0, 2.018088796, -3.495329795), x_dir=(1, 0, 0), z_dir=(0, -0.5000110003630135, 0.866019052628739))):
        with Locations((7.75602892, 22.420928057)):
            Rectangle(ESBO_O2_W, ESBO_O2_H)
    extrude(amount=-CORTE_EXTRUS_O2_DEPTH, mode=Mode.SUBTRACT)

    # Esboço5 → Corte-extrusão3 (cut)
    with BuildSketch(Plane(origin=(0, 2.068089896, -3.5819317), x_dir=(1, 0, 0), z_dir=(0, -0.5000110003630135, 0.866019052628739))):
        with Locations((7.5, 22.420928056)):
            Rectangle(ESBO_O5_W, ESBO_O5_H)
    extrude(amount=-CORTE_EXTRUS_O3_DEPTH, mode=Mode.SUBTRACT)

    # Esboço7 → Corte-extrusão4 (cut)
    with BuildSketch(Plane.XY.offset(3.9)):
        with Locations((7.5, 7.616022)):
            Rectangle(ESBO_O7_W, ESBO_O7_H)
        with Locations((7.5, 7.616022)):
            Circle(ESBO_O7_R, mode=Mode.SUBTRACT)
    extrude(amount=-CORTE_EXTRUS_O4_DEPTH, mode=Mode.SUBTRACT)


solid = part.part
